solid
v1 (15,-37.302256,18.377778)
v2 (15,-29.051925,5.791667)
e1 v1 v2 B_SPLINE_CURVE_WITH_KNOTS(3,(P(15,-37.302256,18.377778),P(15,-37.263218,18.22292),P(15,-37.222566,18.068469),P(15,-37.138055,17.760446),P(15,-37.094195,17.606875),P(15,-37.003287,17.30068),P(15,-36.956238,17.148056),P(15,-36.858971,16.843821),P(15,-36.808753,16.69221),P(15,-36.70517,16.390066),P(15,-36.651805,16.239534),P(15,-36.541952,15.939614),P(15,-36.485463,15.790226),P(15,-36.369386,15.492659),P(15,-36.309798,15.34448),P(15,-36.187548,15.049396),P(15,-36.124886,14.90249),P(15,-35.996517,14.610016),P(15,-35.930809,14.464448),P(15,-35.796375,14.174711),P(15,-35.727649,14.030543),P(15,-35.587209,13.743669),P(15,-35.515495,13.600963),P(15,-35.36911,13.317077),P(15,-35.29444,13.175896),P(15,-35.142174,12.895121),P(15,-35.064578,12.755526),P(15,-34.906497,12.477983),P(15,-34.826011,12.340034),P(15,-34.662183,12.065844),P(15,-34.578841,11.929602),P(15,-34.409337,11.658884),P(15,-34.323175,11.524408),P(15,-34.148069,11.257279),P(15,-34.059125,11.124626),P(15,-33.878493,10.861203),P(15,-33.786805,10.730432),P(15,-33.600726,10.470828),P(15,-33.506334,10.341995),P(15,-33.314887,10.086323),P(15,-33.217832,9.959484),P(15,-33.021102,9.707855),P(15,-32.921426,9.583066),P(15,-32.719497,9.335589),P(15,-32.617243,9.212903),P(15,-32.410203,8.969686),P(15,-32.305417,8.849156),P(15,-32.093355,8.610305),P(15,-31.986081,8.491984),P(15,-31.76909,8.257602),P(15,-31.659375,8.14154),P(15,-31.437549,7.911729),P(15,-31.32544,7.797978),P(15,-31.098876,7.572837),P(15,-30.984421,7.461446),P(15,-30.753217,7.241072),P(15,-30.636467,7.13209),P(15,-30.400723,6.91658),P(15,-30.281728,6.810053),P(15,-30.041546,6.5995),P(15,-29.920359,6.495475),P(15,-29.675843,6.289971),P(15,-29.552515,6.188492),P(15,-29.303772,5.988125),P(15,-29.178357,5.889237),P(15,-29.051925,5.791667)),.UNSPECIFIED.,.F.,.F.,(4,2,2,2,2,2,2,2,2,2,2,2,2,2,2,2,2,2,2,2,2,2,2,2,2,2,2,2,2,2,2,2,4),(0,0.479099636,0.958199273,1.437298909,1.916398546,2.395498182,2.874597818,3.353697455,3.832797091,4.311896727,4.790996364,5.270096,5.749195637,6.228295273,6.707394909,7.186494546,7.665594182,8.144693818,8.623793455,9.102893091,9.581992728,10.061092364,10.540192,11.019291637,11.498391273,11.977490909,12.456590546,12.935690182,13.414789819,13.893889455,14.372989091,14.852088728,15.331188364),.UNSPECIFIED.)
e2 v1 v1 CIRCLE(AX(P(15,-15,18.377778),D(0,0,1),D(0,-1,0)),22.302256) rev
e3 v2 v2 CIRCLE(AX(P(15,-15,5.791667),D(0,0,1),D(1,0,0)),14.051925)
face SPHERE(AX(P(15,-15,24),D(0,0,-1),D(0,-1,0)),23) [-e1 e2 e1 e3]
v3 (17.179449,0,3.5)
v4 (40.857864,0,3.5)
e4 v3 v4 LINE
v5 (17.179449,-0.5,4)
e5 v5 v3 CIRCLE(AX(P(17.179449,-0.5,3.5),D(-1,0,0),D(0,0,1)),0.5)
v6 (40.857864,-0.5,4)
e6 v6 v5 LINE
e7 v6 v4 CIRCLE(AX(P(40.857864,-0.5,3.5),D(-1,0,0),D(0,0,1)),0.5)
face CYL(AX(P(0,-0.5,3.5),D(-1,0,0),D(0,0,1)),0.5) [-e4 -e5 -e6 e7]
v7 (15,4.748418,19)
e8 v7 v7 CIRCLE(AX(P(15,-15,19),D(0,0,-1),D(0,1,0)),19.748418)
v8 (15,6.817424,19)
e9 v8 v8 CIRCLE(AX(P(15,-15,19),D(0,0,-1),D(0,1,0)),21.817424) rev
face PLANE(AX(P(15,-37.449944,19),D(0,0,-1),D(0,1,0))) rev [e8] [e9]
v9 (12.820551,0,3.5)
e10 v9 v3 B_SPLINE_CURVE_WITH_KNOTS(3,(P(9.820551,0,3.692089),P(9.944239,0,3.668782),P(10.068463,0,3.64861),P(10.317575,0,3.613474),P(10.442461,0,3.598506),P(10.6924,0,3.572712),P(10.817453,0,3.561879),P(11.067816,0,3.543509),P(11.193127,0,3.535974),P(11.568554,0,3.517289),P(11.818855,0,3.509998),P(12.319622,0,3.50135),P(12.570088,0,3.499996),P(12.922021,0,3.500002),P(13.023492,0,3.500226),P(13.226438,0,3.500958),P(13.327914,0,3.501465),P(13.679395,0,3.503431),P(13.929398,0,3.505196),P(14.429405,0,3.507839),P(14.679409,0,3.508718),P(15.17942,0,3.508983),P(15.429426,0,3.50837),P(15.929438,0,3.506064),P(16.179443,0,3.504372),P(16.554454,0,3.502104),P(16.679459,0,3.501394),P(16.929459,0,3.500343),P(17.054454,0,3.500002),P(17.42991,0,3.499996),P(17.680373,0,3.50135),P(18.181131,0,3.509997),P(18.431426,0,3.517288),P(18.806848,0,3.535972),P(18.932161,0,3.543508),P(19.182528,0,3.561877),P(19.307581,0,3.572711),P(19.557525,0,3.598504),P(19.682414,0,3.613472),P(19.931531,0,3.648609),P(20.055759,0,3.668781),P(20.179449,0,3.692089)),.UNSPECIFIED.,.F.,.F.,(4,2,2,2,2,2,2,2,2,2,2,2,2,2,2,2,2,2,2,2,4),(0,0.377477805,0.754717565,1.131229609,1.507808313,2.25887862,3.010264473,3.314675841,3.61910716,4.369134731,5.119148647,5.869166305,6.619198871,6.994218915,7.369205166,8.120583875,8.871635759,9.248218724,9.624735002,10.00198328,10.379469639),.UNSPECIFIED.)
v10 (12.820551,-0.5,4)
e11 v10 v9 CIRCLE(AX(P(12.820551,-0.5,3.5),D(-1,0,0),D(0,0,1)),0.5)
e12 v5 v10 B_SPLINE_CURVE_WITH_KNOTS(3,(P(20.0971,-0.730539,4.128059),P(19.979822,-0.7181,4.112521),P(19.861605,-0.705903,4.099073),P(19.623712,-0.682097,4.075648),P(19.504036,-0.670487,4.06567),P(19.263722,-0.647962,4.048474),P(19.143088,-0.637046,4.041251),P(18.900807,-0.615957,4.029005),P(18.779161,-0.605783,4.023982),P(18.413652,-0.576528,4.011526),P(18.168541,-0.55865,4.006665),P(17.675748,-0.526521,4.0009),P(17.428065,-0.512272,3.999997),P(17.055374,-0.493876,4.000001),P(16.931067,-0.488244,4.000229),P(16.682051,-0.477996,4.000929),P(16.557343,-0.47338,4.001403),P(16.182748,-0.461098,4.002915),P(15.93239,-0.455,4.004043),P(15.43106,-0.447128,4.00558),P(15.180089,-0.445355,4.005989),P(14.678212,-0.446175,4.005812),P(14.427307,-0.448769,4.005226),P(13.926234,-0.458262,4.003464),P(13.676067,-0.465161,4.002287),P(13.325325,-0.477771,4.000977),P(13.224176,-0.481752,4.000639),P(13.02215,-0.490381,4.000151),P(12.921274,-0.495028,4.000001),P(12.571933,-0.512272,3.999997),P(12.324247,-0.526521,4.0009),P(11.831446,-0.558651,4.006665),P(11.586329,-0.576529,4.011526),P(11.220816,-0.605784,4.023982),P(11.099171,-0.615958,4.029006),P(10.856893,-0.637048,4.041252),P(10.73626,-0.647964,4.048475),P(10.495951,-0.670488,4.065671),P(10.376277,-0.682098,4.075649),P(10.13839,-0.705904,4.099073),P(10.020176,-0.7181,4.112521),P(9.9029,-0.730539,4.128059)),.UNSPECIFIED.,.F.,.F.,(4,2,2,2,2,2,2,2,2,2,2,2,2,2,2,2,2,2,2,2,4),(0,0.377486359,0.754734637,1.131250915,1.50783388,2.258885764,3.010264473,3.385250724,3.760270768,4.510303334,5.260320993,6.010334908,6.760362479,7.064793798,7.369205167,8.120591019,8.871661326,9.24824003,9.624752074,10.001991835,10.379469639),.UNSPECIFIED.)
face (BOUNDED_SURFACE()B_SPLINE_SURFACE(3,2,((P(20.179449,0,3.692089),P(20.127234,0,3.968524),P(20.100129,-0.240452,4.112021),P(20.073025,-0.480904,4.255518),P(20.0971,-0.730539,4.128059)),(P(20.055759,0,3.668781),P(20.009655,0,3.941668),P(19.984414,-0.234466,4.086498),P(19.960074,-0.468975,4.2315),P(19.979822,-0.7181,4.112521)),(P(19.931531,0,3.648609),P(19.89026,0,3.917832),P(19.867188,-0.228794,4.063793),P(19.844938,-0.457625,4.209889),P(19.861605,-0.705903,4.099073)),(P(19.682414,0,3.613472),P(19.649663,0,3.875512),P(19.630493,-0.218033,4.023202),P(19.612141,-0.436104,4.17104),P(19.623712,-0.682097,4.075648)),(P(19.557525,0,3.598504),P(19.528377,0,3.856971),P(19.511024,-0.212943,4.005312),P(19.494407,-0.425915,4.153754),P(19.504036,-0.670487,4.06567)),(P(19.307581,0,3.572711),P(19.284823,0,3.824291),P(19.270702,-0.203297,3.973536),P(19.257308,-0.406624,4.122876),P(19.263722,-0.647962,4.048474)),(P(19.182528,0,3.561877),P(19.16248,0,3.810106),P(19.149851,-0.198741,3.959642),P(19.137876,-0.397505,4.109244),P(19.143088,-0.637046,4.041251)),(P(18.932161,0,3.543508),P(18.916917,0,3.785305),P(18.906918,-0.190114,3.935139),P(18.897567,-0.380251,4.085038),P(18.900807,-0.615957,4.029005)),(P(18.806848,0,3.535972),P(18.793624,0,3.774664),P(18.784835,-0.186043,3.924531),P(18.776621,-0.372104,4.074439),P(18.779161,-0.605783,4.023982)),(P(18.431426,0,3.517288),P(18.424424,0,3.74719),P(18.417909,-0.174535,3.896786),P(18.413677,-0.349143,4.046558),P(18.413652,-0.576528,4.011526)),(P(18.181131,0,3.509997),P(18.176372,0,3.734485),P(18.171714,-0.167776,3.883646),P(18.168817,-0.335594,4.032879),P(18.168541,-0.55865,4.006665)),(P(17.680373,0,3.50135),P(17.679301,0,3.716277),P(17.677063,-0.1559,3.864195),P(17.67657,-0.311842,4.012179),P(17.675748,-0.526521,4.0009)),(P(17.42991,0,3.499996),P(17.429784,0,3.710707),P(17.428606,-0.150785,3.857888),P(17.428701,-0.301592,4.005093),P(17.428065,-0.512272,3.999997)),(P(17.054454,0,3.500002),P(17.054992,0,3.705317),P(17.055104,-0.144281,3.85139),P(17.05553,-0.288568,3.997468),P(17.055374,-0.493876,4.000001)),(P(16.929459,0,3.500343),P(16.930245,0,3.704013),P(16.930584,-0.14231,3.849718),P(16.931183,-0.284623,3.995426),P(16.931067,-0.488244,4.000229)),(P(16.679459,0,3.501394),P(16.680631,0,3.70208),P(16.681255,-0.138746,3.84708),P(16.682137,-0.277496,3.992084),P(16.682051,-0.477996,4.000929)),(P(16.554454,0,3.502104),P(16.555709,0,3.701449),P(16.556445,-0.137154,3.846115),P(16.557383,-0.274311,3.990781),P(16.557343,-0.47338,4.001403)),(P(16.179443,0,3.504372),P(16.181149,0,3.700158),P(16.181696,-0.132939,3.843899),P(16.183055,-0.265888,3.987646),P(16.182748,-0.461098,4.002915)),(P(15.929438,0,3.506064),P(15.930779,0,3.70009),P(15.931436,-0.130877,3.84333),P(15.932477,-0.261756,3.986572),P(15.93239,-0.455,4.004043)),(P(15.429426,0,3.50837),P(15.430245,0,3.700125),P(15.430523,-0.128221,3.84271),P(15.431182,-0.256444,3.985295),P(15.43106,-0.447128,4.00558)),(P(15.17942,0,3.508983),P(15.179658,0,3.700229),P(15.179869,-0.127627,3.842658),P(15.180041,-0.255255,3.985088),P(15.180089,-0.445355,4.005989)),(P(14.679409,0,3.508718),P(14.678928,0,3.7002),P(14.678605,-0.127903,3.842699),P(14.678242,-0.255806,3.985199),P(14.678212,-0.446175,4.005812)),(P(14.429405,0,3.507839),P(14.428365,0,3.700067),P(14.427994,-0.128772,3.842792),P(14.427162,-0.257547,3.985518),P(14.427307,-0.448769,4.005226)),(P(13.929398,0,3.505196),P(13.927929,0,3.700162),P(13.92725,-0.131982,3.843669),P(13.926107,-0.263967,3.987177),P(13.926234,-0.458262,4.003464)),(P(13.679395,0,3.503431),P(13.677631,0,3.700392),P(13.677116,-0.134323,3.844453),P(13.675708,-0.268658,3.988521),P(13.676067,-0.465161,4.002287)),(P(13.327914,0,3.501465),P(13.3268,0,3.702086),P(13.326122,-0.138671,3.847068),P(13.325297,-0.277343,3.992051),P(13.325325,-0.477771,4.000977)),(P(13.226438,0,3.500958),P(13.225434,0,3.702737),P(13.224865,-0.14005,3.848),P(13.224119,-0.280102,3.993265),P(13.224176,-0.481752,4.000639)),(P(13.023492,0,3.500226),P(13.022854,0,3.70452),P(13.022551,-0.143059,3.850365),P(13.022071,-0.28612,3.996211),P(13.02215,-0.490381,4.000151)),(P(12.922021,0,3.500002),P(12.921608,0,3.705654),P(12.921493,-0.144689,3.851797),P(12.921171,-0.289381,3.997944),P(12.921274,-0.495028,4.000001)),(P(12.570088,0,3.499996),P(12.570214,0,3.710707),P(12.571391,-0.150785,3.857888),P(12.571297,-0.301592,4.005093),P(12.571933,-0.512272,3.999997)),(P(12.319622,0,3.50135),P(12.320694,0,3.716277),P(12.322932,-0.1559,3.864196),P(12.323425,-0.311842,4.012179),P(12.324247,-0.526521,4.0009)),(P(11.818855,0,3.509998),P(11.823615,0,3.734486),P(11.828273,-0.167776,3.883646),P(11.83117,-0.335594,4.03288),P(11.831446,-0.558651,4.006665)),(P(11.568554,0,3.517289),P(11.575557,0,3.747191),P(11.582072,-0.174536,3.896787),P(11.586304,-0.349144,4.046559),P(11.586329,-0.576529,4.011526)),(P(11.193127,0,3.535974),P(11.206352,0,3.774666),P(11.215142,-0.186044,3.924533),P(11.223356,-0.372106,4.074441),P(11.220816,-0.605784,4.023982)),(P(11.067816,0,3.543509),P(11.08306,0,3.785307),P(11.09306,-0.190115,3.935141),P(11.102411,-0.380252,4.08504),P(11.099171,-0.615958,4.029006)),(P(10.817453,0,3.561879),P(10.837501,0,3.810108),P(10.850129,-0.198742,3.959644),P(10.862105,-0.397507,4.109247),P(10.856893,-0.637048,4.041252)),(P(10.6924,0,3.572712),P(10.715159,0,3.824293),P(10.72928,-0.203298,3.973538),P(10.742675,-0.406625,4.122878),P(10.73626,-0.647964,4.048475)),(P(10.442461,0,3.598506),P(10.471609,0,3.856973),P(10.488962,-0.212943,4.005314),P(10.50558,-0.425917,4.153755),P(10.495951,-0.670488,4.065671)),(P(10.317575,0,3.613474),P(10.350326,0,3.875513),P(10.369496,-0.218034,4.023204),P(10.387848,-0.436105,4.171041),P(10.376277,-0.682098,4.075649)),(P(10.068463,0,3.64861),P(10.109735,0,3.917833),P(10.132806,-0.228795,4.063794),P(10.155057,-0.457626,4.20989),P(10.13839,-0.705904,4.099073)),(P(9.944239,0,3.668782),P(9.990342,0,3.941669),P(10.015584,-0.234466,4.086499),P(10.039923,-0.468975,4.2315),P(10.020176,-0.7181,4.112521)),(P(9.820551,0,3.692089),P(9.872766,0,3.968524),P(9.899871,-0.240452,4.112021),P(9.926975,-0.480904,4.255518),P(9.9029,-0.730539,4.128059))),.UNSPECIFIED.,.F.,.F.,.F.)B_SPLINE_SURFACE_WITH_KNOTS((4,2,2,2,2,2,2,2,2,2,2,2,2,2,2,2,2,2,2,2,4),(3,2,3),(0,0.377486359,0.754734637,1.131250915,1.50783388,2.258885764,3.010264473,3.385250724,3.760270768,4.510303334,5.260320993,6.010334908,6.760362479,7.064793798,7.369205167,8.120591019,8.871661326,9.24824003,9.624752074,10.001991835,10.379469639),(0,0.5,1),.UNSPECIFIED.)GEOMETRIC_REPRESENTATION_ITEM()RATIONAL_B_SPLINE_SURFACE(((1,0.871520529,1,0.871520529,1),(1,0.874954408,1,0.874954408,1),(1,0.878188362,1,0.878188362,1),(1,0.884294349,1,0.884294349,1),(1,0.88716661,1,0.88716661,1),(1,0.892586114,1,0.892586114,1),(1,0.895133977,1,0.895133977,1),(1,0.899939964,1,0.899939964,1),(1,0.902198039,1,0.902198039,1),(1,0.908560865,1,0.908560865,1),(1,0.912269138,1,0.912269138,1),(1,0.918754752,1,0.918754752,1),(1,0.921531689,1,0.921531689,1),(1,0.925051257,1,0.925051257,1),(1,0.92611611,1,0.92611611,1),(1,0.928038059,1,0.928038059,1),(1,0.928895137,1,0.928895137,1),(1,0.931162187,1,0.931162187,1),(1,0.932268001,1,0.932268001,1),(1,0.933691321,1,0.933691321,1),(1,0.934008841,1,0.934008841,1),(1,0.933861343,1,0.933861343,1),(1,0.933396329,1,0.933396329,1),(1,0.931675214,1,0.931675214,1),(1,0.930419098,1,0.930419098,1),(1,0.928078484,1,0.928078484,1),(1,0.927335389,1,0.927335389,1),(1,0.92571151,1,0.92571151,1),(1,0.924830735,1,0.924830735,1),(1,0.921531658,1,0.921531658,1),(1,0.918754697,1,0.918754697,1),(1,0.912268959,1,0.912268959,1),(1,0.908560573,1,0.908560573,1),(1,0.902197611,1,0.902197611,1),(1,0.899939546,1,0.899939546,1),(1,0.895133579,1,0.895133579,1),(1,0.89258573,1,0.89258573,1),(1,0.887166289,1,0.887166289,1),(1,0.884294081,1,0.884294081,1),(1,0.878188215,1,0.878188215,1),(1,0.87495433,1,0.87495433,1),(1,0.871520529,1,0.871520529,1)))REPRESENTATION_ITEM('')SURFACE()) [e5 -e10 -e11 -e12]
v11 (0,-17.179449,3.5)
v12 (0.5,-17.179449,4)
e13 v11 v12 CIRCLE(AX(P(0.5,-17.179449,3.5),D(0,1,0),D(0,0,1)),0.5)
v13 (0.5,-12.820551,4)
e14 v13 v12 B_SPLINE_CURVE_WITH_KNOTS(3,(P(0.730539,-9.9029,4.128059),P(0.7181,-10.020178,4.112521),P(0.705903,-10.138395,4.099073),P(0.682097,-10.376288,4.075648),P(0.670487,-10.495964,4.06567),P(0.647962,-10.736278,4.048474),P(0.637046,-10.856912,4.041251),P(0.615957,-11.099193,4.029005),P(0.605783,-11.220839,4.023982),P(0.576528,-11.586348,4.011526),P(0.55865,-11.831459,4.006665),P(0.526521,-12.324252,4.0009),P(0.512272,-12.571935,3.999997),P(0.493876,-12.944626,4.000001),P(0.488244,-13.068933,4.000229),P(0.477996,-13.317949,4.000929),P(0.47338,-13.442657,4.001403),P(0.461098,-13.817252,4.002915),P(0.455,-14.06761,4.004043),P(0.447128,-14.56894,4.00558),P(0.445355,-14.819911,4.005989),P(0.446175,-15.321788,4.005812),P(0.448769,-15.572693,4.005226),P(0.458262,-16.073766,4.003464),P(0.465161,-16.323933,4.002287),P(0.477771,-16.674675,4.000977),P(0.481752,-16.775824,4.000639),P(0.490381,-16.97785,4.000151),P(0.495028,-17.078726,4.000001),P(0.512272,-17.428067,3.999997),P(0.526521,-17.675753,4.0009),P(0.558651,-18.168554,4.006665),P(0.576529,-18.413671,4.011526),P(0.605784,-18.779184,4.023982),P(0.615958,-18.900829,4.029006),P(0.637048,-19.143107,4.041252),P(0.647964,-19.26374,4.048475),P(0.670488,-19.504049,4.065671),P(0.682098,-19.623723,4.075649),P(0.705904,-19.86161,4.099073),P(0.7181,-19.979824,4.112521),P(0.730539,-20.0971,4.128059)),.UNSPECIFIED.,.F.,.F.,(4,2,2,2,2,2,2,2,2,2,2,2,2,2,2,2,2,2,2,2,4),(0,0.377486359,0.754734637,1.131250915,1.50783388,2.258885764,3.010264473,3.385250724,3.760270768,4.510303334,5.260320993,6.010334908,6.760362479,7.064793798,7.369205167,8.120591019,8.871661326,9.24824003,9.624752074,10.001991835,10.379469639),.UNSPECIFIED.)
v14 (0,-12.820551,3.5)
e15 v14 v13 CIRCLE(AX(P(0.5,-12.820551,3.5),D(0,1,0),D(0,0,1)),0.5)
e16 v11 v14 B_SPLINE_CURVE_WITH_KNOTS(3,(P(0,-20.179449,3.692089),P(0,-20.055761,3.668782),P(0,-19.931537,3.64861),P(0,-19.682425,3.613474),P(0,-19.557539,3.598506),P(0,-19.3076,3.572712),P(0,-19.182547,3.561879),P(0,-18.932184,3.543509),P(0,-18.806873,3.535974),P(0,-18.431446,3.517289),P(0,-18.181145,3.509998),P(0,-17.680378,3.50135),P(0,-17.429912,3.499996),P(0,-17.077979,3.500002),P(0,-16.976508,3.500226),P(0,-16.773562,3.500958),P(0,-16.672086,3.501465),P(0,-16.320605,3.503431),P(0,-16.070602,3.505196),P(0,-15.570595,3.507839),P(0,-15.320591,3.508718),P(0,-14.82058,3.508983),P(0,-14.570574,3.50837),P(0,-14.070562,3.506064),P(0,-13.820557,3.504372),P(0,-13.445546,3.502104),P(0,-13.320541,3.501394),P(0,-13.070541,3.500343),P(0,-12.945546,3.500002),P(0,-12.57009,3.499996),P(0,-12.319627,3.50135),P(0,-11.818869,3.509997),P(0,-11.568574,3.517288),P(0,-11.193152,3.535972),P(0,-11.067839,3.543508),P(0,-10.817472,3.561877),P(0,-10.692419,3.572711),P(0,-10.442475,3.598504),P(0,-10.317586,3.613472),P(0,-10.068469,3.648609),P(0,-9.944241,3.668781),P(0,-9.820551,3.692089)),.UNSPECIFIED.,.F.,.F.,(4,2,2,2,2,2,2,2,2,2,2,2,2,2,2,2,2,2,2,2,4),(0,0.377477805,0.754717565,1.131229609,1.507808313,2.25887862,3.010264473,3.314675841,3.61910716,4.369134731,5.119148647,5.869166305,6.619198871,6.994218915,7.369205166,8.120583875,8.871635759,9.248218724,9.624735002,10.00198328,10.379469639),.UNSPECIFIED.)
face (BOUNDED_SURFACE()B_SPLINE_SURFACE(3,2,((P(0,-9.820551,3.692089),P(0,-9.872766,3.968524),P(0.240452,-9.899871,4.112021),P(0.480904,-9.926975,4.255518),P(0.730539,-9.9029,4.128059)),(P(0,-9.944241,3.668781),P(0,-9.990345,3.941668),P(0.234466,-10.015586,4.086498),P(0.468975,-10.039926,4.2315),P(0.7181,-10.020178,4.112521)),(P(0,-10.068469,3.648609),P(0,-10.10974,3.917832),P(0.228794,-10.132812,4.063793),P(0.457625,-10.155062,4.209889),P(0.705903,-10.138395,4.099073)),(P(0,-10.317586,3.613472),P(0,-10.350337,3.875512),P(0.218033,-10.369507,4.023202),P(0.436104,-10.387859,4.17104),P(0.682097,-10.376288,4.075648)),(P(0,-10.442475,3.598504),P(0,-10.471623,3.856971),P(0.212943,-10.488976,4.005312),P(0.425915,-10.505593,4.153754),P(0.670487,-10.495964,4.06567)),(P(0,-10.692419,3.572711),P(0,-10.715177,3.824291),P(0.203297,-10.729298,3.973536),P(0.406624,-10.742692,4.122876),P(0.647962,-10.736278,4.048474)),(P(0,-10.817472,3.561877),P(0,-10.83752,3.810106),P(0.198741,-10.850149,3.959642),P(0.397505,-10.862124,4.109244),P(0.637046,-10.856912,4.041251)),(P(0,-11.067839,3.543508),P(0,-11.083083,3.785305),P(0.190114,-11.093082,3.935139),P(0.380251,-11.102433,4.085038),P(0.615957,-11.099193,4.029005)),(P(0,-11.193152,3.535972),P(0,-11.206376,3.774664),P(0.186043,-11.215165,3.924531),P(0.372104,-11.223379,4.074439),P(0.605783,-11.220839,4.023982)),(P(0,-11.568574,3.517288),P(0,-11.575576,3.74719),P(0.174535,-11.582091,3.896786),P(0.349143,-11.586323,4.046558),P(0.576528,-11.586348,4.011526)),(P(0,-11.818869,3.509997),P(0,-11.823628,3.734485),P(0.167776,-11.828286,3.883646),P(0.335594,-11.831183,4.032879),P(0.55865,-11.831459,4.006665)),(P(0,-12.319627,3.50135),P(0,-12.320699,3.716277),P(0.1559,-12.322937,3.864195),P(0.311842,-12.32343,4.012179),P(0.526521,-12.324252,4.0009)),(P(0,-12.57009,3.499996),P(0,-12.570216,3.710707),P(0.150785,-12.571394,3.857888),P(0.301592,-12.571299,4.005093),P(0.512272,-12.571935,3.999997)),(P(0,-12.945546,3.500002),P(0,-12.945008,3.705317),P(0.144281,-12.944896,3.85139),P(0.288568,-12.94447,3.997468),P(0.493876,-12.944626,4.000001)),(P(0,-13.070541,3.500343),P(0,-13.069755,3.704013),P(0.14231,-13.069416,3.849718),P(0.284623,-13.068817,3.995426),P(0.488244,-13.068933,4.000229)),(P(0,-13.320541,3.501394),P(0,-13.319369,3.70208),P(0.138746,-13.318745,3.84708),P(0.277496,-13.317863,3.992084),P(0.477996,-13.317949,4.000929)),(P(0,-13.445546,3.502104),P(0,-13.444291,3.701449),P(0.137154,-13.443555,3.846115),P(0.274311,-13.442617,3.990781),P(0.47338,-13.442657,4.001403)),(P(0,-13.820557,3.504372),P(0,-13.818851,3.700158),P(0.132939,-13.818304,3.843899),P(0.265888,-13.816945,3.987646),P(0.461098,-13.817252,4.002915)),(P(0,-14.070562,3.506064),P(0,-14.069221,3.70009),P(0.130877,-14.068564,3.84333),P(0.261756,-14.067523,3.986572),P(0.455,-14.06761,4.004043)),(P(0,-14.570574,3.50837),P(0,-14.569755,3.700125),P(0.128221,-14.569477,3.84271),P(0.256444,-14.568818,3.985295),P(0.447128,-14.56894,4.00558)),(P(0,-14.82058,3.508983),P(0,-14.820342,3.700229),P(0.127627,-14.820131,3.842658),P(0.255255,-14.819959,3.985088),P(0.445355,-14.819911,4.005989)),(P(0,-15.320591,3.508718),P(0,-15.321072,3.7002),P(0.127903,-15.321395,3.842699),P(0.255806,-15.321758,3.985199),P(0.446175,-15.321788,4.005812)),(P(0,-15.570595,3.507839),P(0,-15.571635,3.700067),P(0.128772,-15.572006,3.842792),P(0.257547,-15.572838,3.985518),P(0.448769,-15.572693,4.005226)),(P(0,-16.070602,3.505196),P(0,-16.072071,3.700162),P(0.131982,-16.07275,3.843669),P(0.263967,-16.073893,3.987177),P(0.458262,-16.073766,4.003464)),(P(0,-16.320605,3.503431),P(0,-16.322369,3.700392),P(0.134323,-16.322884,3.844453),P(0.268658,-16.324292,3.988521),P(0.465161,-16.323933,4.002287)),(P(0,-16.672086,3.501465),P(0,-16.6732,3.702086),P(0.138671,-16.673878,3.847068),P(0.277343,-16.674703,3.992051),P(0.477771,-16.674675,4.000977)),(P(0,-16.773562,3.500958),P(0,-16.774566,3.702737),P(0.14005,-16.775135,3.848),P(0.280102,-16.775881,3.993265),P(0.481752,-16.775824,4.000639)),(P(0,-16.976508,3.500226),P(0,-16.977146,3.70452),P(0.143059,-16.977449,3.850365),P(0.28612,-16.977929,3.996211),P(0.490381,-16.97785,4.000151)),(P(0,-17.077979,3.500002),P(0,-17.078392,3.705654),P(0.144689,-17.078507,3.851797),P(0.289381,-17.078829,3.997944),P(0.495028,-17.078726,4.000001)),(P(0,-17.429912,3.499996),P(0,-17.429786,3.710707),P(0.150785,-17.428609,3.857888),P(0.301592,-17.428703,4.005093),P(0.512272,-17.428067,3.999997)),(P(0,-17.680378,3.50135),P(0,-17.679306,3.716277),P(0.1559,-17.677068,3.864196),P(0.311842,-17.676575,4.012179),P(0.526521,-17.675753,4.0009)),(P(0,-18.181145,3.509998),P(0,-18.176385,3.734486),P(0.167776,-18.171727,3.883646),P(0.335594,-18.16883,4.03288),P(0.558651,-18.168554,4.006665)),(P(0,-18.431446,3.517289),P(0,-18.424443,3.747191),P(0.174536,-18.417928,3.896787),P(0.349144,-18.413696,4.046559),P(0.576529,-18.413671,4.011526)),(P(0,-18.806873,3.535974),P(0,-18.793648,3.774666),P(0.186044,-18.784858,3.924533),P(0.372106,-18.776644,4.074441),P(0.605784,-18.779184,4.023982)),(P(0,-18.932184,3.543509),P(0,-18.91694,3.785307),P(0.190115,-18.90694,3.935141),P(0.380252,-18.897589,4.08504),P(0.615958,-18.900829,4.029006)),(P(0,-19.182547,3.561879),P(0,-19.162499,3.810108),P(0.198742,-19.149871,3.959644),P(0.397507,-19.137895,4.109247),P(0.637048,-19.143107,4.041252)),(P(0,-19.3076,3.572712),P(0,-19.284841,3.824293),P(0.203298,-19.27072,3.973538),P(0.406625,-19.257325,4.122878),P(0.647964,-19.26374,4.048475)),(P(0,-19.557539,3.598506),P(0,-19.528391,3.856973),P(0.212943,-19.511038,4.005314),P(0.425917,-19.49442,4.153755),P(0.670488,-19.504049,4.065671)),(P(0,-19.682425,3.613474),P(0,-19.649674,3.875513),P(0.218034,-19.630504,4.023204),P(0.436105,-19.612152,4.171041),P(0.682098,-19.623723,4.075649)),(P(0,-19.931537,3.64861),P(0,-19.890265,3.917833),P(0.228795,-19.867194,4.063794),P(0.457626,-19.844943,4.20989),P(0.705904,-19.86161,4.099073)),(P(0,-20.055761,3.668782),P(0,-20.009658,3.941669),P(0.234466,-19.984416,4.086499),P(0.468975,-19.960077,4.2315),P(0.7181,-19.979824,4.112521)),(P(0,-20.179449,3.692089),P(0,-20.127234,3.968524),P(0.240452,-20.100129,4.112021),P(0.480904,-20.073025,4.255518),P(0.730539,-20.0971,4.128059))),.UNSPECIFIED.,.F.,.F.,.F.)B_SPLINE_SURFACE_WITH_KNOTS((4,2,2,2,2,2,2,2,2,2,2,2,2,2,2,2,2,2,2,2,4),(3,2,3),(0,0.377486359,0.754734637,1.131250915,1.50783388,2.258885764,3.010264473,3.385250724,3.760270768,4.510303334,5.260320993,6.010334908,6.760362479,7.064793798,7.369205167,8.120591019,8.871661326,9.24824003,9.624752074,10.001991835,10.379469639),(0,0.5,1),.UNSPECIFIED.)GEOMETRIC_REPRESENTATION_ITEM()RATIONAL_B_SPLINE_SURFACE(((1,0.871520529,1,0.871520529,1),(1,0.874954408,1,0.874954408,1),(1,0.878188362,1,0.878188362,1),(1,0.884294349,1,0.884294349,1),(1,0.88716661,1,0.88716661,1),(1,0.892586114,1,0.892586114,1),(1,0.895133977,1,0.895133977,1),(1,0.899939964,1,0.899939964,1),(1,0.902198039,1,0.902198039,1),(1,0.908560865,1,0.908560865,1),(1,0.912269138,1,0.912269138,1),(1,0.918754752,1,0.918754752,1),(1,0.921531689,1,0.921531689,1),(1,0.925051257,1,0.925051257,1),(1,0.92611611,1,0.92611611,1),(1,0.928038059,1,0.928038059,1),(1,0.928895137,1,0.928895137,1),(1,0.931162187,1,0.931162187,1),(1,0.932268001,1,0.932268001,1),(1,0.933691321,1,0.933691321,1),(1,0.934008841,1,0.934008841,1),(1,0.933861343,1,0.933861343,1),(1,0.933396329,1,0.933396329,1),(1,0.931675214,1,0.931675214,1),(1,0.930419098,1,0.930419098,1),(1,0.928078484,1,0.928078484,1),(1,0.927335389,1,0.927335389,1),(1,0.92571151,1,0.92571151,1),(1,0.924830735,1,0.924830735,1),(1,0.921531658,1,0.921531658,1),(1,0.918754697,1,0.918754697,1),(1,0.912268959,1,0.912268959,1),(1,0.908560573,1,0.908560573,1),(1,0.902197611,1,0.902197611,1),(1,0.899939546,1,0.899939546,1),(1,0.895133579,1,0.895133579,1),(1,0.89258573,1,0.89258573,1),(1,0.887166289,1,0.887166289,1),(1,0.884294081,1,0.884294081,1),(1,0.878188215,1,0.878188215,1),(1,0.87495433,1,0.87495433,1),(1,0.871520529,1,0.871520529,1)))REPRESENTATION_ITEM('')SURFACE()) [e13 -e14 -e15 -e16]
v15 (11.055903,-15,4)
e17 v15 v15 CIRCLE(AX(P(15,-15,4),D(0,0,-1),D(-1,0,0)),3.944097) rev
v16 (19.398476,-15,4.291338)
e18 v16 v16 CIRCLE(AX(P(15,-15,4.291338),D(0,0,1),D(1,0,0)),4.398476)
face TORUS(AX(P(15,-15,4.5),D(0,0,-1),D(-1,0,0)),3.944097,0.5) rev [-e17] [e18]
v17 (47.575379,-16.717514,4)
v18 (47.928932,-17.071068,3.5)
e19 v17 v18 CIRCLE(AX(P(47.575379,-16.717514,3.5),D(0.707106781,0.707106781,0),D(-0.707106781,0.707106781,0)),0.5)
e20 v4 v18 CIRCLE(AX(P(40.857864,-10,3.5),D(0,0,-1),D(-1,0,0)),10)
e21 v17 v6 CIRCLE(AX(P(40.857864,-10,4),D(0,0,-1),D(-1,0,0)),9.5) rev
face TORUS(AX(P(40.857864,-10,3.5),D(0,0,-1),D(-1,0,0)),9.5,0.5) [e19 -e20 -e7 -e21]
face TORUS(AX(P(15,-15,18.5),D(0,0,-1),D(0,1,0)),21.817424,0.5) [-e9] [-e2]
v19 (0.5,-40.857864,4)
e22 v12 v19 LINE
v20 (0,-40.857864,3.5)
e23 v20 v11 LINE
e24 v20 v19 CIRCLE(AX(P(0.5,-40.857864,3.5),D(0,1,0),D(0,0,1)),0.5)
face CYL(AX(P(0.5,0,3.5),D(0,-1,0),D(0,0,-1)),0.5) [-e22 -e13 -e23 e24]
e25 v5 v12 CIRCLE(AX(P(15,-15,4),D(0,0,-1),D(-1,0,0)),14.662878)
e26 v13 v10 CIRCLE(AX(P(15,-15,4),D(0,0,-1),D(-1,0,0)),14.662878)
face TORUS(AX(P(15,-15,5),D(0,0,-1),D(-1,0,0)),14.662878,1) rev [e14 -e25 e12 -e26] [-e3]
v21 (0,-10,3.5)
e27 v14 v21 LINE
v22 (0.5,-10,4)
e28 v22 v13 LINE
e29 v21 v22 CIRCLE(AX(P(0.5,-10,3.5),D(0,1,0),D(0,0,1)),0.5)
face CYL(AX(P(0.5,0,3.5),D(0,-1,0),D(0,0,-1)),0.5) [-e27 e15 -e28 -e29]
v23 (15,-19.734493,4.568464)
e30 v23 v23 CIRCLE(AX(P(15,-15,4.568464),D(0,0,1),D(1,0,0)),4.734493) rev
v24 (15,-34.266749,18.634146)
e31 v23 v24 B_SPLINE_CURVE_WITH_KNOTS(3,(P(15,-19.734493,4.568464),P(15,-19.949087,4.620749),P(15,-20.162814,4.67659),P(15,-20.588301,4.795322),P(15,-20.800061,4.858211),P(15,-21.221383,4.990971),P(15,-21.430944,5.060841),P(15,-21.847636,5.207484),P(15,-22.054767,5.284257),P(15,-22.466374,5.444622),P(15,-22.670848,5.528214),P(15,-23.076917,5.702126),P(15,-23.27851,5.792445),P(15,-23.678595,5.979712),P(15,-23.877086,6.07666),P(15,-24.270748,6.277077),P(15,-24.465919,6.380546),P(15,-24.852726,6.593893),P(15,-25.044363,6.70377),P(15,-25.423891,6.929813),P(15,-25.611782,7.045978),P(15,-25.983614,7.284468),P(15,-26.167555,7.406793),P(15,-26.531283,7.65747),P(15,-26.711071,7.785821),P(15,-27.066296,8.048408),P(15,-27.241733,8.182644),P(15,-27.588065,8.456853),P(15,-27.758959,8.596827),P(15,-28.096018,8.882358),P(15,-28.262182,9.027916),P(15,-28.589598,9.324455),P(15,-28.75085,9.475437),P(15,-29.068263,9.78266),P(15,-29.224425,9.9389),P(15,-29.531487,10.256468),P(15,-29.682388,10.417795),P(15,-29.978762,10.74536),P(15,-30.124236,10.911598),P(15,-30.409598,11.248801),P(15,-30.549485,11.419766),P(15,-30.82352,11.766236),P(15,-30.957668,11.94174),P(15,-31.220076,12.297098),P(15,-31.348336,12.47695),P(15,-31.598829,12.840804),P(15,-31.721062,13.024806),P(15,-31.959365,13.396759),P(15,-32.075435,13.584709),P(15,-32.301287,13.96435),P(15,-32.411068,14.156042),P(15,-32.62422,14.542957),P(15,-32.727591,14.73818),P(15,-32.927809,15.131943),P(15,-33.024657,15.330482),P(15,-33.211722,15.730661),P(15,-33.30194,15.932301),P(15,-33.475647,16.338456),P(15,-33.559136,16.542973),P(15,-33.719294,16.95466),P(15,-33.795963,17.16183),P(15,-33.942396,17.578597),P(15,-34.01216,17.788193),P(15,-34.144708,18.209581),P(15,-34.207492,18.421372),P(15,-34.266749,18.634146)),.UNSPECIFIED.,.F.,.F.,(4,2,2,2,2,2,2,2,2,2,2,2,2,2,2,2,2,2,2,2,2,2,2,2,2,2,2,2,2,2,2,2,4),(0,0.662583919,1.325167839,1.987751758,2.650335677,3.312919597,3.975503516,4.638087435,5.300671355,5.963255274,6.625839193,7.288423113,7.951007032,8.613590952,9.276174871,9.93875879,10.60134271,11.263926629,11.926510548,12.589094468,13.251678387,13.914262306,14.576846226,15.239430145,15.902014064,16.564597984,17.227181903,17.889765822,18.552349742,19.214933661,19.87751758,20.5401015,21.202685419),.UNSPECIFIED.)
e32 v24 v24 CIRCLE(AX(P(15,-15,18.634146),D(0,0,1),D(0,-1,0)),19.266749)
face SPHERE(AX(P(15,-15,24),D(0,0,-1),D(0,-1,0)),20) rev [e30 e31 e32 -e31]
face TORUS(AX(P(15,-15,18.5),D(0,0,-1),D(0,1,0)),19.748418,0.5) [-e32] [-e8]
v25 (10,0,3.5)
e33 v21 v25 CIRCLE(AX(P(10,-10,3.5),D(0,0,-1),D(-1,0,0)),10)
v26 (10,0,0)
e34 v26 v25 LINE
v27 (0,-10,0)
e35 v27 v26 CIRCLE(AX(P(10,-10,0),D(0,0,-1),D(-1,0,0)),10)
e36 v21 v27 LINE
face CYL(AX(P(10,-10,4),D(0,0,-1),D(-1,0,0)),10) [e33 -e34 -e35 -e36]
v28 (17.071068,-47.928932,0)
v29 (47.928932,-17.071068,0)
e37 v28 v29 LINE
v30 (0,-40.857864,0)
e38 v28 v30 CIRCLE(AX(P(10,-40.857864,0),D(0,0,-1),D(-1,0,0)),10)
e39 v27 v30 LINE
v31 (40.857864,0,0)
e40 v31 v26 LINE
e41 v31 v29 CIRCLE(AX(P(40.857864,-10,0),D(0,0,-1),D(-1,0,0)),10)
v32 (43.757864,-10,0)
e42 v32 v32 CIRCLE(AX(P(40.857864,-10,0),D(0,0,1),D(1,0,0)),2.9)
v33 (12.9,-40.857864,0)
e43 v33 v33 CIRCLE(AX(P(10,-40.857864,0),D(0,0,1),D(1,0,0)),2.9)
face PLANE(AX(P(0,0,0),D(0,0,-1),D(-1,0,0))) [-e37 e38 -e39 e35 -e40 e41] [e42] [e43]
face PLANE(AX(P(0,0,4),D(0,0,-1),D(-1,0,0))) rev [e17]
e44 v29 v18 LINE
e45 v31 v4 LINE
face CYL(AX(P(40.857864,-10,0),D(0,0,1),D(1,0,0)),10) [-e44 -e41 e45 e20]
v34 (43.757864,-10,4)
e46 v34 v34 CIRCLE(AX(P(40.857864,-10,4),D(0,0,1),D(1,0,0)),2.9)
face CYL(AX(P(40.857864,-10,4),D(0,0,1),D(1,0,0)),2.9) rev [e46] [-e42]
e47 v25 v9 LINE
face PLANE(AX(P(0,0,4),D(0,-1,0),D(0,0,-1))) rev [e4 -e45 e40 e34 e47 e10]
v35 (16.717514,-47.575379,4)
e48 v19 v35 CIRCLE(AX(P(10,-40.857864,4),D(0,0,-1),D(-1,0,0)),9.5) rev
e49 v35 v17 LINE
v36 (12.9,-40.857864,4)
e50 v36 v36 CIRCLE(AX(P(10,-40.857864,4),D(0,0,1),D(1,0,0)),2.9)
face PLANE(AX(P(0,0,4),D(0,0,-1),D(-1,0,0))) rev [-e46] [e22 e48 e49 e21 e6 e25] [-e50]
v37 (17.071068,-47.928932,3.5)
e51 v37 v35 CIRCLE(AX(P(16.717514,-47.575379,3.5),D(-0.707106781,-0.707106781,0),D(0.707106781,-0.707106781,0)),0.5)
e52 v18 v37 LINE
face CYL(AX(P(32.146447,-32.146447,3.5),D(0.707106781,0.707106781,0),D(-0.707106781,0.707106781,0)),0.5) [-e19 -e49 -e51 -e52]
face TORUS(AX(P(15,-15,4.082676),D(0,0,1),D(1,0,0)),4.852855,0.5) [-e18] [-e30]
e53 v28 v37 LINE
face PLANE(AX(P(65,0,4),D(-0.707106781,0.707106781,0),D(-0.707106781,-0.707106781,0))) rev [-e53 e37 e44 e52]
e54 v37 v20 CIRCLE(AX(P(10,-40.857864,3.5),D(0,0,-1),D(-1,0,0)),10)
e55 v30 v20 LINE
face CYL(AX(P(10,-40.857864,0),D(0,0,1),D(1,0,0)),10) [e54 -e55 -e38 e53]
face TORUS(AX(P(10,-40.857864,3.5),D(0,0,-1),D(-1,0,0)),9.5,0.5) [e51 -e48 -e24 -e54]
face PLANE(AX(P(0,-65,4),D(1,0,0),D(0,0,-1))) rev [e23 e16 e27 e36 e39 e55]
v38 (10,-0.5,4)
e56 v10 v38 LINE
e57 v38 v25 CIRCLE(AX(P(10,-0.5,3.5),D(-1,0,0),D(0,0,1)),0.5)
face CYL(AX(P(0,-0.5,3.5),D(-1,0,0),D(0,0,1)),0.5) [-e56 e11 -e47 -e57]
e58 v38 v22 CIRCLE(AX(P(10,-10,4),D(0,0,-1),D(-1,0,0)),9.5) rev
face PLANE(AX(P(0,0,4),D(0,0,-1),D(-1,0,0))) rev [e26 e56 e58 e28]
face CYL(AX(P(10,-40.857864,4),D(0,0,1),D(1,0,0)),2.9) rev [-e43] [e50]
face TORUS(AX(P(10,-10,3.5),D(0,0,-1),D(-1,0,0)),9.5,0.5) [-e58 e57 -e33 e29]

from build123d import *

# Parameters (mm, degrees)
BOSS_EXTRUDE1_DEPTH  = 4
M5_CLEARANCE_HOLE1_D = 5.8
CUT_EXTRUDE1_DEPTH   = 94.139680051
CUT_EXTRUDE2_DEPTH   = 84.883981599
FILLET1_R            = 10
FILLET2_R            = 1
FILLET3_R            = 0.5
FILLET4_R            = 0.5
FILLET5_R            = 0.5


with BuildPart() as part:
    # Sketch1 → Boss-Extrude1 (new body)
    with BuildSketch(Plane.XY):
        Polygon((0, 0), (65, 0), (0, -65), align=None)
    extrude(amount=BOSS_EXTRUDE1_DEPTH)

    # Sketch2 → Revolve2 (revolve)
    with BuildSketch(Plane(origin=(15, 0, 0), x_dir=(0, 0, -1), z_dir=(1, 0, 0))):
        with BuildLine():
            Line((-19, -37.449944321), (-19, -34.364916731))
            ThreePointArc((-19, -34.364916731), (-9.657050031, -28.938428398), (-4.5, -19.444097209))
            Line((-4.5, -19.444097209), (-4, -19.444097209))
            Line((-4, -19.444097209), (-4, -26.357816692))
            ThreePointArc((-4, -26.357816692), (-10.324883041, -33.493003438), (-19, -37.449944321))
        make_face()
    revolve(axis=Axis((15, -15, 4), (0, 0, 1)))

    # M5 Clearance Hole1 (through all)
    with Locations(Plane.XY.offset(4)):
        with Locations((10, -40.857864376), (40.857864376, -10)):
            Hole(M5_CLEARANCE_HOLE1_D / 2)

    # Sketch6 → Cut-Extrude1 (cut, through all)
    with BuildSketch(Plane.XY.offset(4)):
        with BuildLine():
            Line((0, -40.857864376), (0, -65))
            Line((0, -65), (17.071067812, -47.928932188))
            ThreePointArc((17.071067812, -47.928932188), (6.173165676, -50.096659701), (0, -40.857864376))
        make_face()
    extrude(amount=-CUT_EXTRUDE1_DEPTH, mode=Mode.SUBTRACT)

    # Sketch7 → Cut-Extrude2 (cut, through all)
    with BuildSketch(Plane.XY.offset(4)):
        with BuildLine():
            Line((40.857864376, 0), (65, 0))
            Line((65, 0), (47.928932188, -17.071067812))
            ThreePointArc((47.928932188, -17.071067812), (50.096659701, -6.173165676), (40.857864376, 0))
        make_face()
    extrude(amount=-CUT_EXTRUDE2_DEPTH, mode=Mode.SUBTRACT)

    # Fillet1
    fillet1_edges = [part.edges().sort_by_distance(p)[0] for p in [
        (0, 0, 2),
    ]]
    fillet(fillet1_edges, radius=FILLET1_R)

    # Fillet2
    fillet2_edges = [part.edges().sort_by_distance(p)[0] for p in [
        (15, -3.642183308, 4),
    ]]
    fillet(fillet2_edges, radius=FILLET2_R)

    # Fillet3
    fillet3_edges = [part.edges().sort_by_distance(p)[0] for p in [
        (15, -10.555902791, 4),
    ]]
    fillet(fillet3_edges, radius=FILLET3_R - 0.0001)  # a hair under: the kernel refuses the full size

    # Fillet4
    fillet4_edges = [part.edges().sort_by_distance(p)[0] for p in [
        (15, -10.555902791, 4.5),
        (15, 4.364916731, 19),
        (15, 7.449944321, 19),
    ]]
    fillet(fillet4_edges, radius=FILLET4_R)

    # Fillet5
    fillet5_edges = [part.edges().sort_by_distance(p)[0] for p in [
        (32.5, -32.5, 4),
        (6.173165676, -50.096659701, 4),
        (25.428932188, 0, 4),
        (50.096659701, -6.173165676, 4),
        (0, -25.428932188, 4),
        (2.928932188, -2.928932188, 4),
    ]]
    fillet(fillet5_edges, radius=FILLET5_R)


solid = part.part
